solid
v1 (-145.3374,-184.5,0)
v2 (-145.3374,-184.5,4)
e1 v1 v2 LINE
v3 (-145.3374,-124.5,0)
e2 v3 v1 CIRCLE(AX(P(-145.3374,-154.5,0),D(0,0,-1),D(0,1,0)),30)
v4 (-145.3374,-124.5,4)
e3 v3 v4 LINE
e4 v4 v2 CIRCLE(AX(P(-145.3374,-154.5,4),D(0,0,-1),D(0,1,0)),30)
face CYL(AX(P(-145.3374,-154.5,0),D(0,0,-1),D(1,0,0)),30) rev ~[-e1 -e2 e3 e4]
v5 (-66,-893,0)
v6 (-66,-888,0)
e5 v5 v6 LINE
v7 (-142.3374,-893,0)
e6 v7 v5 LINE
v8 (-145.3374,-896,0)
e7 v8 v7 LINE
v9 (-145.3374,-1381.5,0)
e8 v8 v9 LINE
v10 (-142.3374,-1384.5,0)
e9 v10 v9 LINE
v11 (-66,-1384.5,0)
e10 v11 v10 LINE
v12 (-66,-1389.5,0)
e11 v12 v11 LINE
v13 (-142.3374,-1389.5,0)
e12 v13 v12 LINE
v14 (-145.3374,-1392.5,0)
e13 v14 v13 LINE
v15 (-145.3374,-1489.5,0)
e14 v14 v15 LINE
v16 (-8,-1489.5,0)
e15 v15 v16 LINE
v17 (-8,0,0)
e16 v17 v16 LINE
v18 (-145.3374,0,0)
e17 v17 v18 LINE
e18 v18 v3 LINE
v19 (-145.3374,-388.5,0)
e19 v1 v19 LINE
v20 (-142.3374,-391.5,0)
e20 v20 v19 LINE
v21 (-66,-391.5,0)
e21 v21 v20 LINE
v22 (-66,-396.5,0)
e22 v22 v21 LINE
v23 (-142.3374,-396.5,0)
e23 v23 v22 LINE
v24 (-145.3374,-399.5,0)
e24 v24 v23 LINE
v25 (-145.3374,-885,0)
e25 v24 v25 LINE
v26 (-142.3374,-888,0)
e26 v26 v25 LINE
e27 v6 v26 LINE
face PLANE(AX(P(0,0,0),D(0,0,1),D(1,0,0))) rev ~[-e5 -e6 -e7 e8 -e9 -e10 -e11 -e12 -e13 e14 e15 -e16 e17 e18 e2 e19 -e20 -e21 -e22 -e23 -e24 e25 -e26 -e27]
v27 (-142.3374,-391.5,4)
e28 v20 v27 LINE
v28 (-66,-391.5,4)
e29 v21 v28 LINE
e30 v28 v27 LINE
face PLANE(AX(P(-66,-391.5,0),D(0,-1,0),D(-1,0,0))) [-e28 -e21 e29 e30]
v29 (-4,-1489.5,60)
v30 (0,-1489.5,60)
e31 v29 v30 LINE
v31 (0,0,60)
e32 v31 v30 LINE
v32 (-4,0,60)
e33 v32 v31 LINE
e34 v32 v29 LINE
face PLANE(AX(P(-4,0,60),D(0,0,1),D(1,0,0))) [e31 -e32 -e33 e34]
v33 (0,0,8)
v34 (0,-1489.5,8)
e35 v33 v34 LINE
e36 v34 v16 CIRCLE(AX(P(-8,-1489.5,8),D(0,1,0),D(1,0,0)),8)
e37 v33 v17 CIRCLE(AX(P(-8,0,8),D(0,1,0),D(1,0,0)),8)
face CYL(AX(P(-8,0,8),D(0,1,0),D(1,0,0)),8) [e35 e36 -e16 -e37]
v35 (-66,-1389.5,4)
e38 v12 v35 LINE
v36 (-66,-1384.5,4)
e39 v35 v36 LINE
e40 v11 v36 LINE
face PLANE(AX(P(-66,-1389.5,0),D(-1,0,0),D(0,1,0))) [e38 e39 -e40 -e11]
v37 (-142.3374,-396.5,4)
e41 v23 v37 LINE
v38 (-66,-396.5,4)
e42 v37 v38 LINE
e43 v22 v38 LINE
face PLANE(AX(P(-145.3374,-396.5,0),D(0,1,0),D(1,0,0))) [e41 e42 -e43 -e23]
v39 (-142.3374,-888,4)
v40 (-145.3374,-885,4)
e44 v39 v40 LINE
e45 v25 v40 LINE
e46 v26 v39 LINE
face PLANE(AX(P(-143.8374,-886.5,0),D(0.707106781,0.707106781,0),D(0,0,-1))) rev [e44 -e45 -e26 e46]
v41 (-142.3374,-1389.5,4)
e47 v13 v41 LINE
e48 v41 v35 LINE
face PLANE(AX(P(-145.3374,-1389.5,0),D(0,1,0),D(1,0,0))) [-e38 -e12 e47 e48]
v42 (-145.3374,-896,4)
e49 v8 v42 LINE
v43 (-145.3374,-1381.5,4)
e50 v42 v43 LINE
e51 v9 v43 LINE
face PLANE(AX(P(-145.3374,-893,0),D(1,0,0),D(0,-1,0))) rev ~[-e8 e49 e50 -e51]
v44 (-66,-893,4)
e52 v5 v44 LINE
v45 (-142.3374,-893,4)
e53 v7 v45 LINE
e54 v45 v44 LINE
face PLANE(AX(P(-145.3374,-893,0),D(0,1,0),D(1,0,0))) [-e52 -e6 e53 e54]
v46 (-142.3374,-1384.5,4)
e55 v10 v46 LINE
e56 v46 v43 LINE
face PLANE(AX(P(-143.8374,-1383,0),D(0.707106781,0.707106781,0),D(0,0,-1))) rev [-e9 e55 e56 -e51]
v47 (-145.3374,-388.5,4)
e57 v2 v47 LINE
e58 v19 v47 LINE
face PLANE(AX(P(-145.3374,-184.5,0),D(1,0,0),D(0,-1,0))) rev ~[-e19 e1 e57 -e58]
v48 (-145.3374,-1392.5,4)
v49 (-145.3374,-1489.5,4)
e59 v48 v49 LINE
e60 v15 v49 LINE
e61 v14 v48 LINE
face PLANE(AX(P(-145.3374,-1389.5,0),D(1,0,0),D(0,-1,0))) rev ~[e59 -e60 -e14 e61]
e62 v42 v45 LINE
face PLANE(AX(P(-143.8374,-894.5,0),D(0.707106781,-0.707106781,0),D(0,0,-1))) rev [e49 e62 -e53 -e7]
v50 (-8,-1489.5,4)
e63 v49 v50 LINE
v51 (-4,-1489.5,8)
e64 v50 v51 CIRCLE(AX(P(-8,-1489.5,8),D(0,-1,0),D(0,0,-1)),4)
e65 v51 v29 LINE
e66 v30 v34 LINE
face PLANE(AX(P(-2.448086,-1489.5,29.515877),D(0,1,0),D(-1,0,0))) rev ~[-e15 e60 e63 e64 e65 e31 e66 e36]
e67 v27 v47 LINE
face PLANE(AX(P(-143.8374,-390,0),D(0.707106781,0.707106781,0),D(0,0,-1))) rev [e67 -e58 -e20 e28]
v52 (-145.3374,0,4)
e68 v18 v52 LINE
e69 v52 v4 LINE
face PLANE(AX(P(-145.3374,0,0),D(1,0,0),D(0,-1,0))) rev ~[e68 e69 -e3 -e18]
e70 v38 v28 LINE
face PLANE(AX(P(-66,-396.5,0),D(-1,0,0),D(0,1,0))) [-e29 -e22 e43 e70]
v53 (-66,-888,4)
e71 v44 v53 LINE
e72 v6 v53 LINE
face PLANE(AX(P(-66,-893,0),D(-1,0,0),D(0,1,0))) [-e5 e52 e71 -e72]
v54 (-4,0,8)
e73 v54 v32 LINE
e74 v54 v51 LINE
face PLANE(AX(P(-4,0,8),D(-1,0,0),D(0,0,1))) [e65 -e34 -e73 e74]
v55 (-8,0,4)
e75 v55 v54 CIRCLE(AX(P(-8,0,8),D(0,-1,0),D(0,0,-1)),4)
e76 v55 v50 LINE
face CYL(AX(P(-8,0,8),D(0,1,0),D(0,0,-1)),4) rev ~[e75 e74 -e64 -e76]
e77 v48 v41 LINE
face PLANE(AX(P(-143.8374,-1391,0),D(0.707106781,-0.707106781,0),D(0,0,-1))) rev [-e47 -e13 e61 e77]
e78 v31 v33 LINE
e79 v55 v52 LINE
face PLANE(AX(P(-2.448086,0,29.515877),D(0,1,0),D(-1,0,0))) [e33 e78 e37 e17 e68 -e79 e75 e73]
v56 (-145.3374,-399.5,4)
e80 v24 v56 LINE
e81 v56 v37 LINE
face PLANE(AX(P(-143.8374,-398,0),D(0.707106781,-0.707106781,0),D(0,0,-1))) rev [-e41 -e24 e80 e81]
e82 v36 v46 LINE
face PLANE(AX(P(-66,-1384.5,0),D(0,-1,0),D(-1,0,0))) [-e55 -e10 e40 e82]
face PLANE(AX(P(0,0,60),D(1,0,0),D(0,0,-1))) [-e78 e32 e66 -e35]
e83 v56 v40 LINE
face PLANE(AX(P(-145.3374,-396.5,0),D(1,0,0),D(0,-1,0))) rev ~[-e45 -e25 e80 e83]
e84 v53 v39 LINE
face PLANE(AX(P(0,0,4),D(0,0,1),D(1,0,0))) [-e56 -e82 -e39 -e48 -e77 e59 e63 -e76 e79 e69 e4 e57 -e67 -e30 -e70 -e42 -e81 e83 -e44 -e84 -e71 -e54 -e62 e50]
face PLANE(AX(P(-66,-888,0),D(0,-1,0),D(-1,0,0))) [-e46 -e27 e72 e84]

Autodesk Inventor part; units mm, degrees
ref_plane "YZ Plane" through (0, 0, 0) normal (1, 0, 0) x (0, 1, 0)
ref_plane "XZ Plane" through (0, 0, 0) normal (0, 1, 0) x (-1, 0, 0)
ref_plane "XY Plane" through (0, 0, 0) normal (0, 0, 1) x (1, 0, 0)
sketch "Sketch1" plane through (0, 0, 0) normal (0, 0, 1) x (1, 0, 0)
  line L0 (0, 0) -> (-145.3374, 0)
  line L1 (-145.3374, 0) -> (-145.3374, -1489.5)
  line L2 (-145.3374, -1489.5) -> (0, -1489.5)
  line L3 (0, -1489.5) -> (0, 0)
  line L4 (-145.3374, -1389.5) -> (-66, -1389.5)
  line L5 (-66, -1389.5) -> (-66, -1384.5)
  line L6 (-66, -1384.5) -> (-145.3374, -1384.5)
  line L7 (-145.3374, -1384.5) -> (-145.3374, -1389.5)
  line L8 (-145.3374, -893) -> (-66, -893)
  line L9 (-66, -893) -> (-66, -888)
  line L10 (-66, -888) -> (-145.3374, -888)
  line L11 (-145.3374, -888) -> (-145.3374, -893)
  line L12 (-145.3374, -396.5) -> (-66, -396.5)
  line L13 (-66, -396.5) -> (-66, -391.5)
  line L14 (-66, -391.5) -> (-145.3374, -391.5)
  line L15 (-145.3374, -391.5) -> (-145.3374, -396.5)
  circle A0 centre (-145.3374, -154.5) radius 30
  point P0 (-145.3374, -391.5)
  point P1 (-145.3374, -1384.5)
  point P2 (-145.3374, -124.5)
  point P3 (-145.3374, -184.5)
  dimension "d0" = 1489.5
  dimension "d1" = 145.3374
  dimension "d2" = 5
  dimension "d4" = 100
  dimension "d7" = 496.5
  dimension "d23" = 66
  dimension "d28" = 60
  dimension "d29" = 1335
extrude "Plate1" add sketch "Sketch1" along normal blind 4 contours L3 L2 L1 L4 L5 L6 L8 L9 L10 L12 L13 L14 A0 L0
sketch "Sketch2" plane through (-4, 0, 0) normal (1, 0, 0) x (0, 1, 0)
  line L0 (-1489.5, 0) -> (0, 0)
  line L1 (0, 0) -> (0, 60)
  line L2 (0, 60) -> (-1489.5, 60)
  line L3 (-1489.5, 60) -> (-1489.5, 0)
edge flange "Flange1" height 60 angle 90 thickness 4 bend radius 4 thickness toward (1, 0, 0) relief tear relief width 4 relief depth 2 edges at (0, -744.75, 4) wall of the first edge with corners at (-4, -1489.5, 0) (-4, 0, 0) (-4, 0, 60) (-4, -1489.5, 60)
bend "Bend1"
corner "Corner1"
chamfer "Corner Chamfer1" distance 3 angle 45 6 edges at (-145.3374, -1389.5, 2) (-145.3374, -1384.5, 2) (-145.3374, -893, 2) (-145.3374, -888, 2) (-145.3374, -391.5, 2) (-145.3374, -396.5, 2)
equation "\"d0\" = Стрингер_длина"
equation "\"d1\" = стрингер_глубина_5"
equation "\"d2\" = паз_под_стрингер_толщина"
equation "\"d7\" = 0.333333 * Стрингер_длина"
equation "\"d23\" = паз_под_стрингер_глубина - Thickness"
equation "\"d28\" = 2 * радиус_выреза_под_сварку"
equation "\"d12\" = Thickness"
equation "\"d13\" = BendReliefWidth"
equation "\"d14\" = BendReliefDepth"
equation "\"d15\" = MinimumRemnant"
equation "\"d16\" = TransitionRadius"
equation "\"d17\" = ребро_усилителей"
equation "\"d19\" = BendRadius"
equation "\"d20\" = CornerReliefSize"
equation "\"d21\" = GapSize"
equation "\"d22\" = JacobiRadiusSize"
equation "\"BendRadius\" = Thickness"
equation "\"BendReliefWidth\" = Thickness"
equation "\"BendReliefDepth\" = 0.5 * Thickness"
equation "\"CornerReliefSize\" = 4 * Thickness"
equation "\"MinimumRemnant\" = 2 * Thickness"
equation "\"TransitionRadius\" = BendRadius"
equation "\"JacobiRadiusSize\" = BendRadius"
equation "\"GapSize\" = Thickness"
equation "\"Стрингер_длина\" = 1489.5"
equation "\"стрингер_глубина_5\" = 145.337419"
equation "\"паз_под_стрингер_толщина\" = 5"
equation "\"паз_под_стрингер_глубина\" = 70"
equation "\"Thickness\" = 4"
equation "\"радиус_выреза_под_сварку\" = 30"
equation "\"ребро_усилителей\" = 60"
properties part number "GBK 0203 stringer 5" material "Steel"
